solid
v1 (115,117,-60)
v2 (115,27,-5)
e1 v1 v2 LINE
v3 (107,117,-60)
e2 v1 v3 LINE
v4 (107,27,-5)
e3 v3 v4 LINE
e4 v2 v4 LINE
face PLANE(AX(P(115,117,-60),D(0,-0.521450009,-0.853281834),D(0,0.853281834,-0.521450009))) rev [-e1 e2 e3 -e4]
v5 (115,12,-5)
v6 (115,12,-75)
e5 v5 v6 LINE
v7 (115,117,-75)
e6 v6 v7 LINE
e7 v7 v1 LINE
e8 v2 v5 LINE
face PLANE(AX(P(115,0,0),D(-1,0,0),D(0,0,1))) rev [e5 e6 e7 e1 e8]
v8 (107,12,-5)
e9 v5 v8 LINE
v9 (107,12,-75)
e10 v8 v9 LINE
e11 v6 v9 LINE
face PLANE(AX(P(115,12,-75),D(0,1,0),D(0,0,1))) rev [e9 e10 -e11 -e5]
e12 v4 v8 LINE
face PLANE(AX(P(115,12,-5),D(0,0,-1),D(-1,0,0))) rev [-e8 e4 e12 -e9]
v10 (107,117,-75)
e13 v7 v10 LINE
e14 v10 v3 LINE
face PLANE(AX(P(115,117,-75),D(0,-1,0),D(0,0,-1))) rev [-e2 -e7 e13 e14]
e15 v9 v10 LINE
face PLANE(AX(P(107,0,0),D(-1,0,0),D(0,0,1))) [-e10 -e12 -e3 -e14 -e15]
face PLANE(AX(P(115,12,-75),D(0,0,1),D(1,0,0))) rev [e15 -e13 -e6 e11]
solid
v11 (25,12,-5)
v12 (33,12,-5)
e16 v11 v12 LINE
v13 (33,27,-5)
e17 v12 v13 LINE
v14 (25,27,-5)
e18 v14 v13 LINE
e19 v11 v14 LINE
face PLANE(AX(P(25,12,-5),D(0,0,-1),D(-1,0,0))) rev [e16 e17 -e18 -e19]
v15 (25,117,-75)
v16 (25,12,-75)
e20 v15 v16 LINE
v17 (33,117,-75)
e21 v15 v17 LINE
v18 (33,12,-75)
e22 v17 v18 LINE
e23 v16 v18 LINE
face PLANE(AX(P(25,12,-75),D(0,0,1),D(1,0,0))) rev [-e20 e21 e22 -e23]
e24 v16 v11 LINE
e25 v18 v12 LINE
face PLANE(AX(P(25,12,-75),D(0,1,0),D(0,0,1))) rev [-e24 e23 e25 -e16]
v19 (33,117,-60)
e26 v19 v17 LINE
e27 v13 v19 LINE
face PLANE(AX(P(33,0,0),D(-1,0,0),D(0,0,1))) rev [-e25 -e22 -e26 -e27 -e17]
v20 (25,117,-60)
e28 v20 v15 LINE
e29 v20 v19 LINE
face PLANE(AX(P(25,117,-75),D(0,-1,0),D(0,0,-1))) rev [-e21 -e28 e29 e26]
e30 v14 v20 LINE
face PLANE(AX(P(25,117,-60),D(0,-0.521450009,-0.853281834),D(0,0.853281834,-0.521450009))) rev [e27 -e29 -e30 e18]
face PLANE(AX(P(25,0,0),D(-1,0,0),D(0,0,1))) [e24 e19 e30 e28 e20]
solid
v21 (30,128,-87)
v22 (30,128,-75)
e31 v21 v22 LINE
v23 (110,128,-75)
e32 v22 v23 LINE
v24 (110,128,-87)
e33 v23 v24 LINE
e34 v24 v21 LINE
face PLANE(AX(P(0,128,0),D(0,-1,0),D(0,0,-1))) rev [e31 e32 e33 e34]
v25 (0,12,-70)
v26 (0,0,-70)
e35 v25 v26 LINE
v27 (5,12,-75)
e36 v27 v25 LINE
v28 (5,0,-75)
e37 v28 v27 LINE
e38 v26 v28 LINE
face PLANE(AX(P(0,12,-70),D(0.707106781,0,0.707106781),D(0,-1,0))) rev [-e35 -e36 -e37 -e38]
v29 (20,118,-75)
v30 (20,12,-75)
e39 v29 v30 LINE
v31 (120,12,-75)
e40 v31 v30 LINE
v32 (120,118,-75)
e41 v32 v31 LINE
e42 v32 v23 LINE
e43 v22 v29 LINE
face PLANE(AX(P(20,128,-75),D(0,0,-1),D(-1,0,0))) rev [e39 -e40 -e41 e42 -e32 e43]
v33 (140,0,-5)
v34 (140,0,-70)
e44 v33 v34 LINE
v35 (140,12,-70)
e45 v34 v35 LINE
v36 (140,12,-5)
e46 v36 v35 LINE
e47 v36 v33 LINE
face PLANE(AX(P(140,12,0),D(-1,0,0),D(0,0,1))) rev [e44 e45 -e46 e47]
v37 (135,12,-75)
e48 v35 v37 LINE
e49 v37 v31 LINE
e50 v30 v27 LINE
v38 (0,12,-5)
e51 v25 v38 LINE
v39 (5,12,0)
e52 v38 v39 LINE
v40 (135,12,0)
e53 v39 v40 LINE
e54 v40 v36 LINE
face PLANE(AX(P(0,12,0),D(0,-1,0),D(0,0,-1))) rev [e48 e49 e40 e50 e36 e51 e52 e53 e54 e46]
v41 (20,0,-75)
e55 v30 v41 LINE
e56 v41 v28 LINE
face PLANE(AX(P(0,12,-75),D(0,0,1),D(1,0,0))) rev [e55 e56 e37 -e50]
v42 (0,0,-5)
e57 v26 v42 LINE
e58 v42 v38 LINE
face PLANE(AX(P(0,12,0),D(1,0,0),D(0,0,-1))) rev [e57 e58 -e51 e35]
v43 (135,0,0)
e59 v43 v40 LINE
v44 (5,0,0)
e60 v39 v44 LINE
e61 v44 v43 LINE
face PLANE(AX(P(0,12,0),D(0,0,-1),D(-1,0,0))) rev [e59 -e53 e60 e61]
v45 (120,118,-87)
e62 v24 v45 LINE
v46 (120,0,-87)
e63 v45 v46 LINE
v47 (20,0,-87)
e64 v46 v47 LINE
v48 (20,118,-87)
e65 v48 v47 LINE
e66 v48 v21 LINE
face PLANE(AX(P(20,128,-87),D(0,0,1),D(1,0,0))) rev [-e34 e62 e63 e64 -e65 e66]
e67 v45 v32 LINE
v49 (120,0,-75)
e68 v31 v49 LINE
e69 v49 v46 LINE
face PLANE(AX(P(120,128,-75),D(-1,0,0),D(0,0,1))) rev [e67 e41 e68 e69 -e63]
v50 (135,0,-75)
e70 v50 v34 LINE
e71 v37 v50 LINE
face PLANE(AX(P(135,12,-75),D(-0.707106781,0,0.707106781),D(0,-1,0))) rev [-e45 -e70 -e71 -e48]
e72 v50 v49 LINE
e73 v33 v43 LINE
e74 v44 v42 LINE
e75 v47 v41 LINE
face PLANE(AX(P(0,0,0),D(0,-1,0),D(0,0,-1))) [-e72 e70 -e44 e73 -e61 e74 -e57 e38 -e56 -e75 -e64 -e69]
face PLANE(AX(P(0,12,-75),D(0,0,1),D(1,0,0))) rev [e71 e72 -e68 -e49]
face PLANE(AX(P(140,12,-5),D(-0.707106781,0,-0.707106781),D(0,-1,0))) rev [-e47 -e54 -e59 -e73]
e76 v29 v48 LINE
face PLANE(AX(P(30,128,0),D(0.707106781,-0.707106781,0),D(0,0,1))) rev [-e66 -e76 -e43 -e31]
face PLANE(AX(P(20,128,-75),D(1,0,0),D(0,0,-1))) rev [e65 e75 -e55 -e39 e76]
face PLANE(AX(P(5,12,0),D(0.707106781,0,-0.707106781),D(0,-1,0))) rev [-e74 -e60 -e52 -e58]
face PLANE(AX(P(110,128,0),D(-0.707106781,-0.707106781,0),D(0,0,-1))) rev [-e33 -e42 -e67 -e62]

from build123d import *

# Parameters (mm, degrees)
SKETCH1_W           = 140
SKETCH1_H           = 75
BOSS_EXTRUDE4_DEPTH = 12
SKETCH5_W           = 100
SKETCH5_H           = 12
BOSS_EXTRUDE5_DEPTH = 128
GUSSET1_START       = 107
GUSSET1_DEPTH       = 8
GUSSET2_START       = 25
GUSSET2_DEPTH       = 8
CHAMFER1_SIZE       = 10
CHAMFER2_SIZE       = 5


# Read off the part's stored shape, not the designer's step: Gusset1, Gusset2
with BuildPart() as part:
    # Sketch1 → Boss-Extrude4 (new body)
    with BuildSketch(Plane(origin=(0, 0, 0), x_dir=(1, 0, 0), z_dir=(0, 1, 0))):
        with Locations((70, 37.5)):
            Rectangle(SKETCH1_W, SKETCH1_H)
    extrude(amount=BOSS_EXTRUDE4_DEPTH)

    # Sketch5 → Boss-Extrude5 (add)
    with BuildSketch(Plane(origin=(0, 0, 0), x_dir=(1, 0, 0), z_dir=(0, 1, 0))):
        with Locations((70, 81)):
            Rectangle(SKETCH5_W, SKETCH5_H)
    extrude(amount=BOSS_EXTRUDE5_DEPTH)

    # Chamfer1
    chamfer1_edges = [part.edges().sort_by_distance(p)[0] for p in [
        (20, 128, -81),
        (120, 128, -81),
    ]]
    chamfer(chamfer1_edges, length=CHAMFER1_SIZE)

    # Chamfer2
    chamfer2_edges = [part.edges().sort_by_distance(p)[0] for p in [
        (0, 6, -75),
        (140, 6, -75),
        (140, 6, 0),
        (0, 6, 0),
    ]]
    chamfer(chamfer2_edges, length=CHAMFER2_SIZE)


with BuildPart() as body_2:
    # Gusset1 outline → Gusset1 (new body)
    with BuildSketch(Plane.YZ.offset(GUSSET1_START)):
        Polygon((117, -75), (117, -60), (27, -5), (12, -5), (12, -75), align=None)
    extrude(amount=GUSSET1_DEPTH)


with BuildPart() as body_3:
    # Gusset2 outline → Gusset2 (new body)
    with BuildSketch(Plane.YZ.offset(GUSSET2_START)):
        Polygon((117, -75), (117, -60), (27, -5), (12, -5), (12, -75), align=None)
    extrude(amount=GUSSET2_DEPTH)


solid = Compound([part.part, body_2.part, body_3.part])
